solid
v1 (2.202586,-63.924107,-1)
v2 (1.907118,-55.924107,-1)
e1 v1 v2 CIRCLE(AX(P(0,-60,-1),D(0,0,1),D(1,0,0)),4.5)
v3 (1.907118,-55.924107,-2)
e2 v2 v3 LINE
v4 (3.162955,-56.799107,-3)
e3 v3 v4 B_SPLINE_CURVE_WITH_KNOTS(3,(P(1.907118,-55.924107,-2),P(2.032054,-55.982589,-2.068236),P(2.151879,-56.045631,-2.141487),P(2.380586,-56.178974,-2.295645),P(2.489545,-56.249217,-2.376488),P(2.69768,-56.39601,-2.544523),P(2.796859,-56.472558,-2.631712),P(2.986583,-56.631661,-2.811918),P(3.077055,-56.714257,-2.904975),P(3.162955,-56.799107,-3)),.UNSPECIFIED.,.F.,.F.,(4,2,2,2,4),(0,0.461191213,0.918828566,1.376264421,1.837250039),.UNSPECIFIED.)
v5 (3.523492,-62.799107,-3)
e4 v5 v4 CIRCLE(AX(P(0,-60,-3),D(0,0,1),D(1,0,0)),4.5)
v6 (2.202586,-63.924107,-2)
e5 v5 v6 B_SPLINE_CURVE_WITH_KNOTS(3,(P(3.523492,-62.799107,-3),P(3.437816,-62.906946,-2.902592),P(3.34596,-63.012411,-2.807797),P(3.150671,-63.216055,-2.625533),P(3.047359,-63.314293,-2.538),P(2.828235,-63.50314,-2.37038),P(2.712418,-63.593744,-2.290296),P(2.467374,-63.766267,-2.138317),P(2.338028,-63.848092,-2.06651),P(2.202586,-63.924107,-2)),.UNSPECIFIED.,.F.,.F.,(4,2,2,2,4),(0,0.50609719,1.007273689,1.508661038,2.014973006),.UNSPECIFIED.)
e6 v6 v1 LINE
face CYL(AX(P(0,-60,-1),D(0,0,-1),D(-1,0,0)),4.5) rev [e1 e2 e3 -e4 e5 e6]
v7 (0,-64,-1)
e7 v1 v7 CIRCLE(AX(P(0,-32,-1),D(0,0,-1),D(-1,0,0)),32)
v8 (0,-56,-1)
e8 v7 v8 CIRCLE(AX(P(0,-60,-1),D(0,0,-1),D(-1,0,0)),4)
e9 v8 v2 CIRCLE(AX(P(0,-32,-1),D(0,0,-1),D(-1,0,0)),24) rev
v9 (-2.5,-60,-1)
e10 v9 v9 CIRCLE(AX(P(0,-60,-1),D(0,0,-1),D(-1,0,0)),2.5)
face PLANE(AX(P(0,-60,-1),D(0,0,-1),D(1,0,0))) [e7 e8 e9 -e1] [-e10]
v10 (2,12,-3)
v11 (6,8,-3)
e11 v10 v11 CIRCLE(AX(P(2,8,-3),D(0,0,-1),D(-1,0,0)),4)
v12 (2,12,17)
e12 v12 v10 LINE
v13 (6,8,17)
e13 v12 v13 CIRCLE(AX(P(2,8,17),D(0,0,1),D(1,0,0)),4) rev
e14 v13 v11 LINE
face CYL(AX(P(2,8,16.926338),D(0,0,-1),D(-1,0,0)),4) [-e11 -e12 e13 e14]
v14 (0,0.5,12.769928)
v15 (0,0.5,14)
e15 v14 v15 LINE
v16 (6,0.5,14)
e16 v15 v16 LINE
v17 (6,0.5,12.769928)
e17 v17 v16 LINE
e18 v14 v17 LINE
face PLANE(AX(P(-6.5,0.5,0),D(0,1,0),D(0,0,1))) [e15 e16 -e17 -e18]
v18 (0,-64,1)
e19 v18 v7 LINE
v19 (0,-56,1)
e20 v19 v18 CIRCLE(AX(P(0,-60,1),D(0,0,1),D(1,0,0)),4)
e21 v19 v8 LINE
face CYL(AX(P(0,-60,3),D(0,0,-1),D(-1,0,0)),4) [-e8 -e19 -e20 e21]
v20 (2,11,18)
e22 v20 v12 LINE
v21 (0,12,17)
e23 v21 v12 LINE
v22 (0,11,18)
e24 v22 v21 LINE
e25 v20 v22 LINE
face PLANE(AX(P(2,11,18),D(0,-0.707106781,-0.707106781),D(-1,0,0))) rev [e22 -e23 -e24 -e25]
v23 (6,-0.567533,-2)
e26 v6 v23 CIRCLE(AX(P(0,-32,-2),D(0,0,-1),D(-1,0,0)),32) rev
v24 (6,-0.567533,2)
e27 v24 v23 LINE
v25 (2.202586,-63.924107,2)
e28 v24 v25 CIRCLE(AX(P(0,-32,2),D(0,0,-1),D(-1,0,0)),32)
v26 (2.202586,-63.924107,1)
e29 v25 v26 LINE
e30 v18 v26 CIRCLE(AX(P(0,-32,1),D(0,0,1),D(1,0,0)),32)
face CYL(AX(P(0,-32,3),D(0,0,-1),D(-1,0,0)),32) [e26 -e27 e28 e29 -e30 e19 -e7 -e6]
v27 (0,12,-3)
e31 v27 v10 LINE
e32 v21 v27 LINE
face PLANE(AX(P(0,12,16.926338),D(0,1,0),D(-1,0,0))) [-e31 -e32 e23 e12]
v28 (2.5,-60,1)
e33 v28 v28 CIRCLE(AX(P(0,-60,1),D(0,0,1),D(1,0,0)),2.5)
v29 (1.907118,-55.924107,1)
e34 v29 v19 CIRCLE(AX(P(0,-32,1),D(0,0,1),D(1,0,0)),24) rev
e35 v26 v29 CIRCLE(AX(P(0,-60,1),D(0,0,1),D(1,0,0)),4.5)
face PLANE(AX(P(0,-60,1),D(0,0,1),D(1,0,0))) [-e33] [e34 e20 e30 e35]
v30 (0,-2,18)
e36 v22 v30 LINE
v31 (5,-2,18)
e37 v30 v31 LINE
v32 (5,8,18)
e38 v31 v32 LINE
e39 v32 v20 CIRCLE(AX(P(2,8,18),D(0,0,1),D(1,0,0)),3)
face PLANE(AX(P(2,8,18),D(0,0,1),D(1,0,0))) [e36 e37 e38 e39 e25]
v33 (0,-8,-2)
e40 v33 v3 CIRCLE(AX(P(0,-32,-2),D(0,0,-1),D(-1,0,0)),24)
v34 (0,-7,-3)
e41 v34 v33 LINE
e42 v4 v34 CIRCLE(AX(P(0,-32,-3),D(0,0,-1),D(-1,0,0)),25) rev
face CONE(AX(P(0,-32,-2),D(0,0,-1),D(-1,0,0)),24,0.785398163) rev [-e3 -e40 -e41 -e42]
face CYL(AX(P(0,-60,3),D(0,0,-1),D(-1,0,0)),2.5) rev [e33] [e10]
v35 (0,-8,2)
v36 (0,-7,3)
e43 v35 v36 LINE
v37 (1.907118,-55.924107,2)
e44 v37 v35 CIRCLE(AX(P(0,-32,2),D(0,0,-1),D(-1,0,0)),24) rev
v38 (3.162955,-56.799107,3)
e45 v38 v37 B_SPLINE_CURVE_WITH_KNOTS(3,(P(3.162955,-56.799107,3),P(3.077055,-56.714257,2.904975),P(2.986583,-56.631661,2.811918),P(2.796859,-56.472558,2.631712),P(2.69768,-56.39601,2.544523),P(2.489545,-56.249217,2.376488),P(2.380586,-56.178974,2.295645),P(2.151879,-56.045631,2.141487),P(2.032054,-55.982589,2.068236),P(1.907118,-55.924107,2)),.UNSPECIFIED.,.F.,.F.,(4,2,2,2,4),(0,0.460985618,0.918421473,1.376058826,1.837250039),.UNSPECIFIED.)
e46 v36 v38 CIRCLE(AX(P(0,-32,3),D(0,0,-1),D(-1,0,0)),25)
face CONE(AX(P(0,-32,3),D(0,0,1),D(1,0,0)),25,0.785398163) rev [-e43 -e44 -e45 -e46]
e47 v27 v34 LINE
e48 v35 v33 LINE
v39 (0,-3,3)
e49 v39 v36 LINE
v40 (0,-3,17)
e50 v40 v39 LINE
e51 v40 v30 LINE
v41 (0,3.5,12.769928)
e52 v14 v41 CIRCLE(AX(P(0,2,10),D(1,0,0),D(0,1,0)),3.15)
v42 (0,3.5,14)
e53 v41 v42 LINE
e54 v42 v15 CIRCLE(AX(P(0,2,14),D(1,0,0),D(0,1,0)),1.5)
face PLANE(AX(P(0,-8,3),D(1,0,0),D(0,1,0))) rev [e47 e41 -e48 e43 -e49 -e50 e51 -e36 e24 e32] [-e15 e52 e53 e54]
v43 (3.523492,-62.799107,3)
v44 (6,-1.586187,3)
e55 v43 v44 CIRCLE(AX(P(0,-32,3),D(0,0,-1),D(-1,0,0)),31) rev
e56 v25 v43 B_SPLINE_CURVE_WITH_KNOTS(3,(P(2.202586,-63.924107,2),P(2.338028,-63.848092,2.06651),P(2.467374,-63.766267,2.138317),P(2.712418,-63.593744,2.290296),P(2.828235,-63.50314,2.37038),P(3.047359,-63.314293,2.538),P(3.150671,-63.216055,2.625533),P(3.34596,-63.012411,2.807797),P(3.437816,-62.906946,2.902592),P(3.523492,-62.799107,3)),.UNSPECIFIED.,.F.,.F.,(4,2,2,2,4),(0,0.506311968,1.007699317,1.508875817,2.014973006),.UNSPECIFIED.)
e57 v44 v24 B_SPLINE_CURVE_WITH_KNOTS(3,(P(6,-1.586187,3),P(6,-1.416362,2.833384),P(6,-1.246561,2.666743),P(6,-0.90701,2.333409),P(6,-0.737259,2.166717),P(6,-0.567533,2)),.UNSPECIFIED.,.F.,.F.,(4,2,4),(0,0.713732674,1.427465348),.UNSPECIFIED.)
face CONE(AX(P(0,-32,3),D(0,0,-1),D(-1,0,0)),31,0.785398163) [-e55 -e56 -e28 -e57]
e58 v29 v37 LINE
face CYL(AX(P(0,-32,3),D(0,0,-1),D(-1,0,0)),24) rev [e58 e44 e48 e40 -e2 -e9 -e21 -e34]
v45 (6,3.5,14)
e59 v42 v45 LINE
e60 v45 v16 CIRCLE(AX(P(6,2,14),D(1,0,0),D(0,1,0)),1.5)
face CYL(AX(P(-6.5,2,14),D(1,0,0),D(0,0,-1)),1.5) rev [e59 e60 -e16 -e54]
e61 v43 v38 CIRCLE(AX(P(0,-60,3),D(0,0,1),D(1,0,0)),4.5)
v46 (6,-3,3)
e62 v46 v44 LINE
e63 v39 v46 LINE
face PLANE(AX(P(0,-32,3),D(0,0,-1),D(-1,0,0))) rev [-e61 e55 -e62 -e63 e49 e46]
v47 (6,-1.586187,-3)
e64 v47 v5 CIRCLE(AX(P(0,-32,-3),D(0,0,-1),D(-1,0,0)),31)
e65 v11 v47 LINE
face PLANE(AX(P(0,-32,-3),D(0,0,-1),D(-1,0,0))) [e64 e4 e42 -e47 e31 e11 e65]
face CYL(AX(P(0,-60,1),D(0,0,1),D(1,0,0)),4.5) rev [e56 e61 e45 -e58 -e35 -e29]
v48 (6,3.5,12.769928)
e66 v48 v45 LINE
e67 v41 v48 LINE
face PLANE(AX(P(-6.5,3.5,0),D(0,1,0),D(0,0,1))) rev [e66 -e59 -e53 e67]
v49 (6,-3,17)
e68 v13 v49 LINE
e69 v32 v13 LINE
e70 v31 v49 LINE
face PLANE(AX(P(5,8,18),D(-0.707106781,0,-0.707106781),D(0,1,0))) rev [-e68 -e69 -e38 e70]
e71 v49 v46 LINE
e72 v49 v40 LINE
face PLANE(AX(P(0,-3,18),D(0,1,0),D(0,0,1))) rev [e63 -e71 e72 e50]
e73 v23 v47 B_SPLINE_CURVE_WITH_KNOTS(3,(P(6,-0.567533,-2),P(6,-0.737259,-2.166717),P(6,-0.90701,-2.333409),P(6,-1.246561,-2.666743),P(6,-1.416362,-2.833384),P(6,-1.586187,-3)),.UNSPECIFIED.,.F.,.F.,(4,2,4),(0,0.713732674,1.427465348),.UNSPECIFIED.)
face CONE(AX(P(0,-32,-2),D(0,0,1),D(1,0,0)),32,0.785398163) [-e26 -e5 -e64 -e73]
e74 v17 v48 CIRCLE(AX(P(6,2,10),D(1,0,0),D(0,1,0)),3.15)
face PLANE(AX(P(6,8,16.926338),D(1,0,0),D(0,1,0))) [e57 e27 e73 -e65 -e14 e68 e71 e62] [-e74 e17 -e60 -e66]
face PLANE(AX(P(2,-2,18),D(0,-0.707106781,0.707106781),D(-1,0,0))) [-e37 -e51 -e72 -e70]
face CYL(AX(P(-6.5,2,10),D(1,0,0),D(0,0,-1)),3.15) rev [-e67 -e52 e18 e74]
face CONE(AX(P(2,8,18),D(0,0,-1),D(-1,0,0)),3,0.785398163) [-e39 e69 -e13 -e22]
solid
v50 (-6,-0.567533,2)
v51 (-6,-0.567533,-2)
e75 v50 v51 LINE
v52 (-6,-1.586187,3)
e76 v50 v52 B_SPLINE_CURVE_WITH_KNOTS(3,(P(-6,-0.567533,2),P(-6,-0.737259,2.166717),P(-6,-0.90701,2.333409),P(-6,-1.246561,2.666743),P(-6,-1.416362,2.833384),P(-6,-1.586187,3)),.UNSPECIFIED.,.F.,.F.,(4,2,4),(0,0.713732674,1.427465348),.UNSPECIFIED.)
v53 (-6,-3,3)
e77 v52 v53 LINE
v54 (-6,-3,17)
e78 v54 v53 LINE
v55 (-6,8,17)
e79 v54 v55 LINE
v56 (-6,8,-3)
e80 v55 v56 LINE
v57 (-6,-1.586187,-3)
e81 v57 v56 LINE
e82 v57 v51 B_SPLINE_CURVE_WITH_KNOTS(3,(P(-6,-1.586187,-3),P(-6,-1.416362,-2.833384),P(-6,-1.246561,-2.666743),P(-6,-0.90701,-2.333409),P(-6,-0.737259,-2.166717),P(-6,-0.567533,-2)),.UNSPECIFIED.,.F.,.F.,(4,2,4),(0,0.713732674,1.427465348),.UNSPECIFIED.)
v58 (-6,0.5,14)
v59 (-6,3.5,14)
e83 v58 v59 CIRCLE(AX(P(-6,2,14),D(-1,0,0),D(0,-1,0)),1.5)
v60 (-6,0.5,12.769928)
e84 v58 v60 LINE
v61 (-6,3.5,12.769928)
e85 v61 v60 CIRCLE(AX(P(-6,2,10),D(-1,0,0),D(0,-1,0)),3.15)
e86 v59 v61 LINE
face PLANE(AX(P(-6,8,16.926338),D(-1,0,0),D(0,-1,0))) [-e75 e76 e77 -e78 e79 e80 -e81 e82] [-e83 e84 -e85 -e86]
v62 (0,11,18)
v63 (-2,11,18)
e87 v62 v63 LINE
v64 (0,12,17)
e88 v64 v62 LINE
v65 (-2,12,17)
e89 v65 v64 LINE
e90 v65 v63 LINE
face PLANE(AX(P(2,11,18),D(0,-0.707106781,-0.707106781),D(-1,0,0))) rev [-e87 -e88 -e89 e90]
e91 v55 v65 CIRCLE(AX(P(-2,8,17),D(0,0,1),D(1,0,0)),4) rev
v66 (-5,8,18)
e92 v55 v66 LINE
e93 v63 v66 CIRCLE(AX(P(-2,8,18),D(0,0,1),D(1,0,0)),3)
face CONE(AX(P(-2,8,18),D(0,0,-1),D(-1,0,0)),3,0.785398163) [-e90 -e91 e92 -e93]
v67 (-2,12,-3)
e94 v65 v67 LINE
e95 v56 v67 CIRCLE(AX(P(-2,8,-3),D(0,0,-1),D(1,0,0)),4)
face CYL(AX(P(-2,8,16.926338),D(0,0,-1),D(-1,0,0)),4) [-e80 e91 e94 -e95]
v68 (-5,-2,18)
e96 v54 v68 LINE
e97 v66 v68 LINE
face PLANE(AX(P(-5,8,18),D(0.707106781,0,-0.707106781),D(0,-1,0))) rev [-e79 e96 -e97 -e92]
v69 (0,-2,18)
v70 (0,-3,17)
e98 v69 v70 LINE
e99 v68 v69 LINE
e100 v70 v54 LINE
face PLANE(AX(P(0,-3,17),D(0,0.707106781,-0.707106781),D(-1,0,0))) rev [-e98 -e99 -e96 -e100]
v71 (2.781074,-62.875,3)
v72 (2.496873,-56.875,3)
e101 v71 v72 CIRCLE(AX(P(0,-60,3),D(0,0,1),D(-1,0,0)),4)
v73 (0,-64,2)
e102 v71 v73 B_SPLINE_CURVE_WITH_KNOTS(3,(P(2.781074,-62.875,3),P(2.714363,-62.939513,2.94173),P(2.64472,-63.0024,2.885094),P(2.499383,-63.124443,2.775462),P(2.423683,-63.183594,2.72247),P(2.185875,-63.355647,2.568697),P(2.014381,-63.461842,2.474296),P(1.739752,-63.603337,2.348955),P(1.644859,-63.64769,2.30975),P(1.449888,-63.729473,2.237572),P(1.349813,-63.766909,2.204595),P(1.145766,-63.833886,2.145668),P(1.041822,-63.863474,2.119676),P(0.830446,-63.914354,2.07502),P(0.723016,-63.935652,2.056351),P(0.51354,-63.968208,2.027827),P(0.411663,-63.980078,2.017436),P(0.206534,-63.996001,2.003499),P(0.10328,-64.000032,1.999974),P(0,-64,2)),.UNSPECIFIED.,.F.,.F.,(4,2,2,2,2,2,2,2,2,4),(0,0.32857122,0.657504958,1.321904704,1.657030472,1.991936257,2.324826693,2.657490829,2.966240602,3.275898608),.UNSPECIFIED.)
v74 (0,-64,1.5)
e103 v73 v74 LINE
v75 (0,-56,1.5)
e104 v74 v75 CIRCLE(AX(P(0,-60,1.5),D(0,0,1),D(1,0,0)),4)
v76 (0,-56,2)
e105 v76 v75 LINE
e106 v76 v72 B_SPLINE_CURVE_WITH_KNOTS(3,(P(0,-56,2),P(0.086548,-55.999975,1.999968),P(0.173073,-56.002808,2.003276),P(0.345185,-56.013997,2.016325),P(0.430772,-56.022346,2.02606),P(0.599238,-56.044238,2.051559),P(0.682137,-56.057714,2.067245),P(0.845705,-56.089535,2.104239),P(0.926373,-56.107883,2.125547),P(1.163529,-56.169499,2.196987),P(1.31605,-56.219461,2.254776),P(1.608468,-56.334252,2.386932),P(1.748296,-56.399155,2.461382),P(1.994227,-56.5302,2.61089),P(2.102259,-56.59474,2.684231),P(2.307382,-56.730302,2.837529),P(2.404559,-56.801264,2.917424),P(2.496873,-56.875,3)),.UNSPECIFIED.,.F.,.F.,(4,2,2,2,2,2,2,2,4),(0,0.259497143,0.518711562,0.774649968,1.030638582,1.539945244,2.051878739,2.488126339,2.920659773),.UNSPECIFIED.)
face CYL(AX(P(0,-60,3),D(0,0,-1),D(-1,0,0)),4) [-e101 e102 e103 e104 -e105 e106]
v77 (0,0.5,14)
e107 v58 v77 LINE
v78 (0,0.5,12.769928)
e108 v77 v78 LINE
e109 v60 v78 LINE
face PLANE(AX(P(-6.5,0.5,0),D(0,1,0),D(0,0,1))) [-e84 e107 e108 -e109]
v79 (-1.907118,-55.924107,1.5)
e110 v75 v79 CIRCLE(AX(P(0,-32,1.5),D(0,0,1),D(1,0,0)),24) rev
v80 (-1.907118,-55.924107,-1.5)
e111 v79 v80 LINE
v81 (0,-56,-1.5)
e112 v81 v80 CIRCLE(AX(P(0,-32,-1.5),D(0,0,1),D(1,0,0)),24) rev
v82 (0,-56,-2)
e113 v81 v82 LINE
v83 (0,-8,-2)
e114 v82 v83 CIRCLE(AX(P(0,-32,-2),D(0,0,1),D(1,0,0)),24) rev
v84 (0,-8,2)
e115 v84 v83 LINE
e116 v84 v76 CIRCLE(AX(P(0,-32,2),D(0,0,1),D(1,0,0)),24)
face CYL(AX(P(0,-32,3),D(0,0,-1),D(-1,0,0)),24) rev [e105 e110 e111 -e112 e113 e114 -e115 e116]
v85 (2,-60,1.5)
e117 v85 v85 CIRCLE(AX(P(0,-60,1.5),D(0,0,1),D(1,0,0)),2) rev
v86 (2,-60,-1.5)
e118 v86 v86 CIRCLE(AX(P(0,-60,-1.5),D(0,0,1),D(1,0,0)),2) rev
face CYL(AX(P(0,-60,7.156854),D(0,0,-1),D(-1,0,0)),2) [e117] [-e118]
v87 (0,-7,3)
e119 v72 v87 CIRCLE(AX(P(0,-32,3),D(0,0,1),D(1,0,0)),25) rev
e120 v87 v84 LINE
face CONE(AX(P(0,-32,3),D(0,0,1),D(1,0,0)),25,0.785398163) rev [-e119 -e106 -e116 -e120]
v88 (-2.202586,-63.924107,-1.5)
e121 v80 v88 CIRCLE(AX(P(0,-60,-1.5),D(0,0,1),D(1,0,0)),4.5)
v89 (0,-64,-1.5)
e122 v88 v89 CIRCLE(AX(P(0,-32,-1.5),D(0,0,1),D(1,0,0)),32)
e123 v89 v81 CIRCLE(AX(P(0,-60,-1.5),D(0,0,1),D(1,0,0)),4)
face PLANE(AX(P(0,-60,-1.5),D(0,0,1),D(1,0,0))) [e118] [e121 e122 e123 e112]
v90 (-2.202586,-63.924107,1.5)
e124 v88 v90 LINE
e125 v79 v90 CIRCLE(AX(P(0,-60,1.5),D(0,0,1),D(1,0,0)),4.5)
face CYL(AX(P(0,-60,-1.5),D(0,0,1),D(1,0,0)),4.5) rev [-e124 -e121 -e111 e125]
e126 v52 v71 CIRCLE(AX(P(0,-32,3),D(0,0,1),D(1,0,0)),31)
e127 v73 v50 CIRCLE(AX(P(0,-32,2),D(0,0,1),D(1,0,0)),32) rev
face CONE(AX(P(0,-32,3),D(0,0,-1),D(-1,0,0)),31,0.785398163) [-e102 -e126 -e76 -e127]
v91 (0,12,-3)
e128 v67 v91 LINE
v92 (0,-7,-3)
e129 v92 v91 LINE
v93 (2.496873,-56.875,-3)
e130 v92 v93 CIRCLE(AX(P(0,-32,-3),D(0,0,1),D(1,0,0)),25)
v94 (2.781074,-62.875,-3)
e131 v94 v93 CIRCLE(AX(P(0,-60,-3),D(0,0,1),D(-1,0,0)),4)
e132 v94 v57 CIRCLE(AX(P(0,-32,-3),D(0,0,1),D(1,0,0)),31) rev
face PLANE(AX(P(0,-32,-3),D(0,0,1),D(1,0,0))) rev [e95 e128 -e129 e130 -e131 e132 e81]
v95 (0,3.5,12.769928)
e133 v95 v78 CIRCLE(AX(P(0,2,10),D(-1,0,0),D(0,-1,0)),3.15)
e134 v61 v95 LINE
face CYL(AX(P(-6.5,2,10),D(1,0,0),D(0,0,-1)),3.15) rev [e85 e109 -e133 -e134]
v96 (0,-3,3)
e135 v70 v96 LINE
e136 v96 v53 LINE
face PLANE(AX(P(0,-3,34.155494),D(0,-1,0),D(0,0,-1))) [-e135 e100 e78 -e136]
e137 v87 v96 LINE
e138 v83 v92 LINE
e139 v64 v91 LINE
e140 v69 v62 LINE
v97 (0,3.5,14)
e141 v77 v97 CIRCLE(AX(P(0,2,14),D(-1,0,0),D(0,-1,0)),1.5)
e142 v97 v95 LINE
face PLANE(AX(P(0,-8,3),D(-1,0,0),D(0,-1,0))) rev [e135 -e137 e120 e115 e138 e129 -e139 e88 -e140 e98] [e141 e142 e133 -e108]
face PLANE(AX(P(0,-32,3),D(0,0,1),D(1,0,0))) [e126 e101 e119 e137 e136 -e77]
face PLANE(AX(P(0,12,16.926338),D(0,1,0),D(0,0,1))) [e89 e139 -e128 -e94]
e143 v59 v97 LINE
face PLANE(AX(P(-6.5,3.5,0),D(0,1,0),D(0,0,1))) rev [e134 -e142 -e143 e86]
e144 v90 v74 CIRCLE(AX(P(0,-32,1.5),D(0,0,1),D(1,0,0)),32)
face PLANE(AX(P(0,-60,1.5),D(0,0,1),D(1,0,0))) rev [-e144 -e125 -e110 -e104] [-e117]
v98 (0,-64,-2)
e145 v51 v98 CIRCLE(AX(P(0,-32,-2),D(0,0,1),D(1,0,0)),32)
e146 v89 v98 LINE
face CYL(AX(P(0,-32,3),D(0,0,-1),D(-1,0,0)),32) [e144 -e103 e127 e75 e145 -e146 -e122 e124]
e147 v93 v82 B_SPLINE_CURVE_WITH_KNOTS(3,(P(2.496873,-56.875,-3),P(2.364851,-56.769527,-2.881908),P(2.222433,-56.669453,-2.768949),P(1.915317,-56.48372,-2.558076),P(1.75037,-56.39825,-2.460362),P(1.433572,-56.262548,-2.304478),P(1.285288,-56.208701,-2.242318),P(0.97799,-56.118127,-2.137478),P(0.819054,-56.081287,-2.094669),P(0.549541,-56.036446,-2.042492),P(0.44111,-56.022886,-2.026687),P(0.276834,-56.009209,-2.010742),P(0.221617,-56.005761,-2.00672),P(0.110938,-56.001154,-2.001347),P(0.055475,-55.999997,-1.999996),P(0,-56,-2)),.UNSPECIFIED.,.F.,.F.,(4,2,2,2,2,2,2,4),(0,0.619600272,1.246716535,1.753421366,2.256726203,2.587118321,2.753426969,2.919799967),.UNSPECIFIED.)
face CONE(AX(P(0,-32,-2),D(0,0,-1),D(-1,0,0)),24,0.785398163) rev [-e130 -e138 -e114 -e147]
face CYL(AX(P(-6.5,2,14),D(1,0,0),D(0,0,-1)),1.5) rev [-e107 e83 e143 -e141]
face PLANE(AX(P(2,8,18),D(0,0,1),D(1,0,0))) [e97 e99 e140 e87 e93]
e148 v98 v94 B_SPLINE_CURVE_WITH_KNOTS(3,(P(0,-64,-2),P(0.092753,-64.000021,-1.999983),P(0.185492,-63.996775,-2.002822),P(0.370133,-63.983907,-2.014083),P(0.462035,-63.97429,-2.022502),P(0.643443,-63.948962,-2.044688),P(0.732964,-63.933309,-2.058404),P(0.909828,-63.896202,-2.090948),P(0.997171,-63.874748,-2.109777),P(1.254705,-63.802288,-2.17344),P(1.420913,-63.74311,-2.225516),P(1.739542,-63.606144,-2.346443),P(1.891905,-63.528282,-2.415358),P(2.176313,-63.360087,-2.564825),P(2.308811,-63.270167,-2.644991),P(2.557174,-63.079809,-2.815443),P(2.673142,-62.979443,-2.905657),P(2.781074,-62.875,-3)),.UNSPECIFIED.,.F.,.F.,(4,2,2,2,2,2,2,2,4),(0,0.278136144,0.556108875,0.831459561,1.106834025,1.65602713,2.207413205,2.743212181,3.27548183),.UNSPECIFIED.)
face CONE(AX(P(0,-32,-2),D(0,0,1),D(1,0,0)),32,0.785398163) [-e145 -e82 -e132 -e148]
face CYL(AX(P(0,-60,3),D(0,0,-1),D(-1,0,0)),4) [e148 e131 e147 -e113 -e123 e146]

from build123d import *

# Parameters (mm, degrees)
AUFSATZ_LINEAR_AUSTRAGEN1_DEPTH             = 3
SKIZZE2_R                                   = 4.5
SCHNITT_LINEAR_AUSTRAGEN1_DEPTH             = 1.5
AUFSATZ_LINEAR_AUSTRAGEN2_REACH             = 73.617
SKIZZE3_R                                   = 2
AUFSATZ_LINEAR_AUSTRAGEN2_DIRECTION_2_REACH = 73.617
SKIZZE4_R                                   = 2.5
AUFSATZ_LINEAR_AUSTRAGEN4_DEPTH             = 3
SKIZZE5_R                                   = 4.5
SCHNITT_LINEAR_AUSTRAGEN2_DEPTH             = 2
AUFSATZ_LINEAR_START                        = -6
AUFSATZ_LINEAR_AUSTRAGEN5_DEPTH             = 6
AUFSATZ_LINEAR_AUSTRAGEN6_DEPTH             = 6
AUFSATZ_LINEAR_AUSTRAGEN7_DEPTH             = 15
AUFSATZ_LINEAR_START_2                      = 15
AUFSATZ_LINEAR_AUSTRAGEN9_DEPTH             = 15
SCHNITT_LINEAR_AUSTRAGEN3_DEPTH             = 6.5
FASE1_SIZE                                  = 1
FASE2_SIZE                                  = 1
FASE3_SIZE                                  = 1
FASE4_START                                 = -3
FASE4_2_DEPTH                               = 6
FASE5_SIZE                                  = 1
FASE6_SIZE                                  = 1


with BuildPart() as part:
    # Skizze1 → Aufsatz-Linear austragen1 (new, symmetric)
    with BuildSketch(Plane.XY):
        with BuildLine():
            Line((0, -8), (0, 0))
            ThreePointArc((0, 0), (-32, -32), (0, -64))
            ThreePointArc((0, -64), (4, -60), (0, -56))
            ThreePointArc((0, -56), (-24, -32), (0, -8))
        make_face()
    extrude(amount=AUFSATZ_LINEAR_AUSTRAGEN1_DEPTH, both=True)

    # Skizze2 → Schnitt-Linear austragen1 (cut, symmetric)
    with BuildSketch(Plane.XY):
        with Locations((0, -60)):
            Circle(SKIZZE2_R)
    extrude(amount=SCHNITT_LINEAR_AUSTRAGEN1_DEPTH, both=True, mode=Mode.SUBTRACT)

    # Aufsatz-Linear austragen2: up to this face of the body (flat: up to its plane)
    aufsatz_linear_austragen2_end = Plane(part.part.faces().sort_by_distance((-0.306004635, -59.992467517, 1.5))[0])
    # Skizze3 → Aufsatz-Linear austragen2 (add, up to the picked face)
    with BuildSketch(Plane.XY, mode=Mode.PRIVATE) as aufsatz_linear_austragen2_sk1:
        with Locations((0, -60)):
            Circle(SKIZZE3_R)
    aufsatz_linear_austragen2_tool1 = split(extrude(aufsatz_linear_austragen2_sk1.sketch, amount=AUFSATZ_LINEAR_AUSTRAGEN2_REACH, mode=Mode.PRIVATE), bisect_by=aufsatz_linear_austragen2_end, keep=Keep.BOTH, mode=Mode.PRIVATE)
    add(aufsatz_linear_austragen2_tool1.solids().sort_by(Axis((0, -60, 0), (0, 0, 1)))[0])

    # Aufsatz-Linear austragen2 direction 2: up to this face of the body (flat: up to its plane)
    aufsatz_linear_austragen2_direction_2_end = Plane(part.part.faces().sort_by_distance((-0.306004635, -59.992467517, -1.5))[0])
    # Skizze3 → Aufsatz-Linear austragen2 direction 2 (add, up to the picked face)
    with BuildSketch(Plane.XY, mode=Mode.PRIVATE) as aufsatz_linear_austragen2_direction_2_sk1:
        with Locations((0, -60)):
            Circle(SKIZZE3_R)
    aufsatz_linear_austragen2_direction_2_tool1 = split(extrude(aufsatz_linear_austragen2_direction_2_sk1.sketch, amount=-AUFSATZ_LINEAR_AUSTRAGEN2_DIRECTION_2_REACH, mode=Mode.PRIVATE), bisect_by=aufsatz_linear_austragen2_direction_2_end, keep=Keep.BOTH, mode=Mode.PRIVATE)
    add(aufsatz_linear_austragen2_direction_2_tool1.solids().sort_by(Axis((0, -60, 0), (0, 0, -1)))[0])

    # Skizze7 → Aufsatz-Linear austragen6 (add)
    with BuildSketch(Plane(origin=(0, 0, -3), x_dir=(-1, 0, 0), z_dir=(0, 0, -1)).offset(AUFSATZ_LINEAR_START)):
        with BuildLine():
            Line((0, 0), (0, 12))
            Line((0, 12), (2, 12))
            ThreePointArc((2, 12), (4.828427125, 10.828427125), (6, 8))
            Line((6, 8), (6, -0.567532709))
            ThreePointArc((6, -0.567532709), (3.013390672, -0.142199124), (0, 0))
        make_face()
    extrude(amount=AUFSATZ_LINEAR_AUSTRAGEN6_DEPTH)

    # Skizze9 → Aufsatz-Linear austragen9 (add)
    with BuildSketch(Plane.XY.offset(3).offset(AUFSATZ_LINEAR_START_2)):
        with BuildLine():
            Line((-6, -3), (0, -3))
            Line((0, -3), (0, 12))
            Line((0, 12), (-2, 12))
            ThreePointArc((-2, 12), (-4.828427125, 10.828427125), (-6, 8))
            Line((-6, 8), (-6, -0.567532709))
            Line((-6, -0.567532709), (-6, -3))
        make_face()
    extrude(amount=-AUFSATZ_LINEAR_AUSTRAGEN9_DEPTH)


with BuildPart() as body_2:
    # Skizze4 → Aufsatz-Linear austragen4 (new, symmetric)
    with BuildSketch(Plane.XY):
        with BuildLine():
            Line((0, -8), (0, 0))
            ThreePointArc((0, 0), (32, -32), (0, -64))
            ThreePointArc((0, -64), (-4, -60), (0, -56))
            ThreePointArc((0, -56), (24, -32), (0, -8))
        make_face()
        with Locations((0, -60)):
            Circle(SKIZZE4_R, mode=Mode.SUBTRACT)
    extrude(amount=AUFSATZ_LINEAR_AUSTRAGEN4_DEPTH, both=True)

    # Skizze5 → Schnitt-Linear austragen2 (cut)
    with BuildSketch(Plane.XY.offset(3)):
        with Locations((0, -60)):
            Circle(SKIZZE5_R)
    schnitt_linear_austragen2 = extrude(amount=-SCHNITT_LINEAR_AUSTRAGEN2_DEPTH, mode=Mode.SUBTRACT)

    # Spiegeln1: Schnitt-Linear austragen2 across plane
    add(schnitt_linear_austragen2.mirror(Plane.XY), mode=Mode.SUBTRACT)

    # Skizze6 → Aufsatz-Linear austragen5 (add)
    with BuildSketch(Plane(origin=(0, 0, -3), x_dir=(-1, 0, 0), z_dir=(0, 0, -1)).offset(AUFSATZ_LINEAR_START)):
        with BuildLine():
            Line((0, 0), (0, 12))
            Line((0, 12), (-2, 12))
            ThreePointArc((-2, 12), (-4.828427125, 10.828427125), (-6, 8))
            Line((-6, 8), (-6, -0.567532709))
            ThreePointArc((-6, -0.567532709), (-3.013390672, -0.142199124), (0, 0))
        make_face()
    extrude(amount=AUFSATZ_LINEAR_AUSTRAGEN5_DEPTH)

    # Skizze8 → Aufsatz-Linear austragen7 (add)
    with BuildSketch(Plane.XY.offset(3)):
        with BuildLine():
            Line((0, -3), (6, -3))
            Line((6, -3), (6, 8))
            ThreePointArc((6, 8), (4.828427125, 10.828427125), (2, 12))
            Line((2, 12), (0, 12))
            Line((0, 12), (0, -3))
        make_face()
    extrude(amount=AUFSATZ_LINEAR_AUSTRAGEN7_DEPTH)


with BuildPart() as schnitt_linear_austragen3_tool:
    # Skizze10 → Schnitt-Linear austragen3 (new, symmetric)
    with BuildSketch(Plane(origin=(0, 0, 0), x_dir=(0, 0, -1), z_dir=(1, 0, 0))):
        with BuildLine():
            Line((-14, 0.5), (-12.769927797, 0.5))
            ThreePointArc((-12.769927797, 0.5), (-6.85, 2), (-12.769927797, 3.5))
            Line((-12.769927797, 3.5), (-14, 3.5))
            ThreePointArc((-14, 3.5), (-15.5, 2), (-14, 0.5))
        make_face()
    extrude(amount=SCHNITT_LINEAR_AUSTRAGEN3_DEPTH, both=True)


with BuildPart() as part_1:
    add(part.part)

    # Schnitt-Linear austragen3: cut by schnitt_linear_austragen3_tool
    add(schnitt_linear_austragen3_tool.part, mode=Mode.SUBTRACT)

    # Fase2
    # the kernel refuses this chamfer: 1 mm, written as the material it takes off along each edge
    with BuildSketch(Plane(origin=(0, -32, 3), x_dir=(0.10711985504033346, -0.9942461147302201, 0), z_dir=(0.9942461147302201, 0.10711985504033346, 0))) as fase2_piece_1:
        Polygon((24, FASE2_SIZE), (24 + FASE2_SIZE, 0), (24, 0), align=None)
    revolve(axis=Axis((0, -32, 3), (0, 0, -1)), revolution_arc=192.298628552, mode=Mode.SUBTRACT)
    with BuildSketch(Plane(origin=(0, -32, -3), x_dir=(0.10711985504033346, -0.9942461147302201, 0), z_dir=(0.9942461147302201, 0.10711985504033346, 0))) as fase2_piece_2:
        Polygon((24, -FASE2_SIZE), (24 + FASE2_SIZE, 0), (24, 0), align=None)
    revolve(axis=Axis((0, -32, -3), (0, 0, -1)), revolution_arc=192.298628552, mode=Mode.SUBTRACT)

    # Fase4: read off the stored shape, not the designer's step
    # Fase4 outline → Fase4 (revolve, cut)
    with BuildSketch(Plane.XZ.offset(32)):
        Polygon((32.000006898, 3), (31, 3), (32.000006898, 1.999993102), align=None)
        Polygon((32.000006898, -3), (32.000006898, -1.999994955), (31, -3), align=None)
    revolve(axis=Axis((0, -32, 0), (0, 0, 1)), mode=Mode.SUBTRACT)

    # Fase4 2 outline → Fase4 2 (add)
    with BuildSketch(Plane.XY.offset(FASE4_START)):
        with BuildLine():
            Line((0, -1), (0, 6.898e-06))
            ThreePointArc((0, 6.898e-06), (-3.013390666, -0.142192195), (-6, -0.567525686))
            Line((-6, -0.567525686), (-6, -1.586187349))
            ThreePointArc((-6, -1.586187349), (-3.014283315, -1.146894871), (0, -1))
        make_face()
    extrude(amount=FASE4_2_DEPTH)

    # Fase6
    fase6_edges = [part_1.edges().sort_by_distance(p)[0] for p in [
        (-3, -3, 18),
        (-4.828427125, 10.828427125, 18),
        (-6, 2.5, 18),
        (-1, 12, 18),
    ]]
    chamfer(fase6_edges, length=FASE6_SIZE)


with BuildPart() as body_2_1:
    add(body_2.part)

    # Schnitt-Linear austragen3: cut by schnitt_linear_austragen3_tool
    add(schnitt_linear_austragen3_tool.part, mode=Mode.SUBTRACT)

    # Fase1
    fase1_edges = [body_2_1.edges().sort_by_distance(p)[0] for p in [
        (23.98101928, -31.045686485, 3),
        (23.98101928, -31.045686485, -3),
    ]]
    chamfer(fase1_edges, length=FASE1_SIZE)

    # Fase3
    fase3_edges = [body_2_1.edges().sort_by_distance(p)[0] for p in [
        (31.942674958, -33.914553878, 3),
        (31.942674958, -33.914553878, -3),
    ]]
    chamfer(fase3_edges, length=FASE3_SIZE)

    # Fase5
    fase5_edges = [body_2_1.edges().sort_by_distance(p)[0] for p in [
        (3, -3, 18),
        (6, 2.5, 18),
        (4.828427125, 10.828427125, 18),
        (1, 12, 18),
    ]]
    chamfer(fase5_edges, length=FASE5_SIZE)


solid = Compound([part_1.part, body_2_1.part])
